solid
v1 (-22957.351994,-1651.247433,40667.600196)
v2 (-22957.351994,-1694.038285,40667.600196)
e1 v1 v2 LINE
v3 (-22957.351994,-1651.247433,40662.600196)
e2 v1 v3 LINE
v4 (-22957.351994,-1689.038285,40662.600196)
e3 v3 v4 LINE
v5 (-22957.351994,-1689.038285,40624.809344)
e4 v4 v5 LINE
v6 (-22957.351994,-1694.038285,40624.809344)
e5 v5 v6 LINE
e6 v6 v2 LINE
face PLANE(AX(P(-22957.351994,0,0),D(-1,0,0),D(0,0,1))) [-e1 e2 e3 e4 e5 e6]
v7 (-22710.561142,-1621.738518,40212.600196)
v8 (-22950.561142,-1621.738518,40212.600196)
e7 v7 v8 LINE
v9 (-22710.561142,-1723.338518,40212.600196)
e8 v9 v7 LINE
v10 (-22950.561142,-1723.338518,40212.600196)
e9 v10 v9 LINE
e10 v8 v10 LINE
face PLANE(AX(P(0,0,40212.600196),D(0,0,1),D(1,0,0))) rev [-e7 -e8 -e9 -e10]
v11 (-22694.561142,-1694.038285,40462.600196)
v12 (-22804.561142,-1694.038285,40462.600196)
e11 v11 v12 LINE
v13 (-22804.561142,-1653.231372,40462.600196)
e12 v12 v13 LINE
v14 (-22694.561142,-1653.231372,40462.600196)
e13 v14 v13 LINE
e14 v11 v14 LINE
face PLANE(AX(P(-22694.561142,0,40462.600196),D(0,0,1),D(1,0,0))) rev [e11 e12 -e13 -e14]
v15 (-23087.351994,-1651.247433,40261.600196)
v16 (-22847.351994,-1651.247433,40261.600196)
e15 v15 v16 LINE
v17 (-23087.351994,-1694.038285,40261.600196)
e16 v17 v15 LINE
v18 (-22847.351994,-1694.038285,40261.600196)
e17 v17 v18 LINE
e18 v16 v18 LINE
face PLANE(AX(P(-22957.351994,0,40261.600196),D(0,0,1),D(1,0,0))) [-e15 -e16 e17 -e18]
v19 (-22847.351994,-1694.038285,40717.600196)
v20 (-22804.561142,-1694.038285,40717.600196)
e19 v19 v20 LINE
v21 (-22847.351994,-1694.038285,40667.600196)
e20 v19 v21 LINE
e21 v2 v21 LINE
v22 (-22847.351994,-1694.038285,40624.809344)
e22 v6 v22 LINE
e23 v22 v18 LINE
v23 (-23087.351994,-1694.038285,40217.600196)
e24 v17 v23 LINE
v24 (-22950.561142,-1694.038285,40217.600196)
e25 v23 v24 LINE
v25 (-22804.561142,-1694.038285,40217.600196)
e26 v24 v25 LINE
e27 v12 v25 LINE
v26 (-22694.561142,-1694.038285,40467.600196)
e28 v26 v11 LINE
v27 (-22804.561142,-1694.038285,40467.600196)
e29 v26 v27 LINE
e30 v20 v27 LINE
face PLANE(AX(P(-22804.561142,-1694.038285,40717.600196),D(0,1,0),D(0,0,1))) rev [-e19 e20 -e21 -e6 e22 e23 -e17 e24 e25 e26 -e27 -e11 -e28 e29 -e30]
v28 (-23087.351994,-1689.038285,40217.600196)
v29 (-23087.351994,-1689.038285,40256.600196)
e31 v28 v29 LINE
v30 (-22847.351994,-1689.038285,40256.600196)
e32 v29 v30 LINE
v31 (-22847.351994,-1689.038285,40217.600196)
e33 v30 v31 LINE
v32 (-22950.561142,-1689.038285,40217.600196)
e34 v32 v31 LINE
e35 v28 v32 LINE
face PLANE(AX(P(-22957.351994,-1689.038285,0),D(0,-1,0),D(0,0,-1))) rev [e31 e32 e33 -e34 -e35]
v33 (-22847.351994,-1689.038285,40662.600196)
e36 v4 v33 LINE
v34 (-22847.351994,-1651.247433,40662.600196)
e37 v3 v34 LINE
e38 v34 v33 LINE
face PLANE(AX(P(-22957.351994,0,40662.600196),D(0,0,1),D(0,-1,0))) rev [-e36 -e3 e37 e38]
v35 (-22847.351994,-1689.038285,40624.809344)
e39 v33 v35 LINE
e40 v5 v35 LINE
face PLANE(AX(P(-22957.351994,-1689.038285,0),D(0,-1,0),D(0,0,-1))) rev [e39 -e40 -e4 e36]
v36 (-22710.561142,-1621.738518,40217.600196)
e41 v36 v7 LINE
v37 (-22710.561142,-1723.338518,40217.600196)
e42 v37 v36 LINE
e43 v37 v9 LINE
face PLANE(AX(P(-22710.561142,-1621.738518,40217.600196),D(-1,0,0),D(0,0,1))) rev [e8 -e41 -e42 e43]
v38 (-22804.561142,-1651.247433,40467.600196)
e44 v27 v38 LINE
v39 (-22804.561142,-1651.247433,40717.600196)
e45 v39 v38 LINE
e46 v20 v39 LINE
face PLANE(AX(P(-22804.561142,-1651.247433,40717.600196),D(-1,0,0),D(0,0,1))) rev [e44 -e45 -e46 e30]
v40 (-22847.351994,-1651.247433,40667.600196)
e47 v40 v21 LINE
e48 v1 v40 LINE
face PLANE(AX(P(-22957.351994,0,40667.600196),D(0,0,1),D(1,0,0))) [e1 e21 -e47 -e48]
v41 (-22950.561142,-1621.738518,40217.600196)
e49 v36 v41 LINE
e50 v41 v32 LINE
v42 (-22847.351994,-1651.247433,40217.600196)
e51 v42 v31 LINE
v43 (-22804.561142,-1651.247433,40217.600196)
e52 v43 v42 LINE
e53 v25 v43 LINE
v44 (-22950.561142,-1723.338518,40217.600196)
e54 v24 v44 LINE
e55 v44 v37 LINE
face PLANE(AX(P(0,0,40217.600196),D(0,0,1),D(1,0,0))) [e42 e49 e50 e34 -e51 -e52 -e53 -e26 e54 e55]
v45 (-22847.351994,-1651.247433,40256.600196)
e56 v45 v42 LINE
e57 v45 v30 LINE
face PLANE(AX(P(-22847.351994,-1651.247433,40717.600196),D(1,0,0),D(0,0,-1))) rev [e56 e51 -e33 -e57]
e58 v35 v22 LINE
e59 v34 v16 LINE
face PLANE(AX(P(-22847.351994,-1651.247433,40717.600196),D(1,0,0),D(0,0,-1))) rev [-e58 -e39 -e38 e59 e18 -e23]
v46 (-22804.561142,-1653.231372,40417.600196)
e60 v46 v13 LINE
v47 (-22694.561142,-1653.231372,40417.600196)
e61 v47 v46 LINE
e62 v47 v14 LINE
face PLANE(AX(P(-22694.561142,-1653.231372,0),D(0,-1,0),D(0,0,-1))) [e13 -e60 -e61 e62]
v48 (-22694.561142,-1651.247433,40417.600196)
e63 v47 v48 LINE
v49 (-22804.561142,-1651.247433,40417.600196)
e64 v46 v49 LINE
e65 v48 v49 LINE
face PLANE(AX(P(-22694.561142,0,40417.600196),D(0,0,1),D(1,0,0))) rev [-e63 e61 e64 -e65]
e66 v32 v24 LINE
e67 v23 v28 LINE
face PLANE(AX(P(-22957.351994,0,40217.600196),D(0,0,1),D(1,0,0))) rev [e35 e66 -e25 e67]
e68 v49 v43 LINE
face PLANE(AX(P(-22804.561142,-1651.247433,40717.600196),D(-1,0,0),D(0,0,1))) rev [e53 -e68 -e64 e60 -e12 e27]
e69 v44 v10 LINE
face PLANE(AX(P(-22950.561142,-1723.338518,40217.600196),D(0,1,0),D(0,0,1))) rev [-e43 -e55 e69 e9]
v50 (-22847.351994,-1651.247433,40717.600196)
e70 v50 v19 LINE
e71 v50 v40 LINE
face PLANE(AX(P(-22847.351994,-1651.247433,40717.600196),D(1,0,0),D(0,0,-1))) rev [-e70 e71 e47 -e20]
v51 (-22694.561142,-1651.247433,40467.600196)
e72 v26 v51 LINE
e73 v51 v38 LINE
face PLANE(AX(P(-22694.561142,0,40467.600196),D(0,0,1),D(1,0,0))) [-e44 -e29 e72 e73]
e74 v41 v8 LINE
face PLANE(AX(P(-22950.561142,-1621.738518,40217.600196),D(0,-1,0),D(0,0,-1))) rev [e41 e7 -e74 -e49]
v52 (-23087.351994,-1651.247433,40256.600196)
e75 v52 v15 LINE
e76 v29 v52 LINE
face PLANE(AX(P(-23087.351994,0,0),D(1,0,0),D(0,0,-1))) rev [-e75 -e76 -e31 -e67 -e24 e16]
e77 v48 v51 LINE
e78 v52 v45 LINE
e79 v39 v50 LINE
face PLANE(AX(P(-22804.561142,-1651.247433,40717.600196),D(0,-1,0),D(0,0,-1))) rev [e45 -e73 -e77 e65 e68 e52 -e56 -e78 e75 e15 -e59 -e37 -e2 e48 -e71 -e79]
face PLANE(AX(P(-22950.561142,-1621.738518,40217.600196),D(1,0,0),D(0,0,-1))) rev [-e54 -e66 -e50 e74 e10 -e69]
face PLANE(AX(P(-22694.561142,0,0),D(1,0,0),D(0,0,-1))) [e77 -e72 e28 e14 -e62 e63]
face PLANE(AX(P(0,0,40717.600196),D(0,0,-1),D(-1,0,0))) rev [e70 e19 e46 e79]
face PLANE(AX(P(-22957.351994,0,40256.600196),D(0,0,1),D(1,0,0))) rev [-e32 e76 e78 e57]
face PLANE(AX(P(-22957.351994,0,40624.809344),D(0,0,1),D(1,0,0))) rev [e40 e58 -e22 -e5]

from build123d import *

# Parameters (mm, degrees)
SKETCH1_W             = 240
SKETCH1_H             = 101.6
BOSS_EXTRUDE1_DEPTH   = 5
SKETCH2_W             = 42.790852113
SKETCH2_H             = 42.790852114
BOSS_EXTRUDE2_DEPTH   = 500
BOSS_EXTRUDE3_DEPTH   = 110
BOSS_EXTRUDE4_DEPTH   = 110
BOSS_EXTRUDE4_2_DEPTH = 110
BOSS_EXTRUDE5_START   = 110
BOSS_EXTRUDE5_DEPTH   = 130


# Read off the part's stored shape, not the designer's step: Boss-Extrude3
with BuildPart() as part:
    # Sketch1 → Boss-Extrude1 (new body)
    with BuildSketch(Plane.XY.offset(40212.600196068)):
        with Locations((-22830.561141865, -1672.538517707)):
            Rectangle(SKETCH1_W, SKETCH1_H)
    extrude(amount=BOSS_EXTRUDE1_DEPTH)


with BuildPart() as body_2:
    # Sketch2 → Boss-Extrude2 (new body)
    with BuildSketch(Plane.XY.offset(40217.600196068)):
        with Locations((-22825.956567922, -1672.642858756)):
            Rectangle(SKETCH2_W, SKETCH2_H)
    extrude(amount=BOSS_EXTRUDE2_DEPTH)


with BuildPart() as body_3:
    # Boss-Extrude3 outline → Boss-Extrude3 (new body)
    with BuildSketch(Plane(origin=(-22804.561141865, 0, 0), x_dir=(0, 0, -1), z_dir=(1, 0, 0))):
        Polygon((-40467.600196068, -1694.038284813), (-40462.600196068, -1694.038284813), (-40462.600196068, -1653.231371608), (-40417.600196068, -1653.231371608), (-40417.600196068, -1651.247432699), (-40467.600196068, -1651.247432699), align=None)
    extrude(amount=BOSS_EXTRUDE3_DEPTH)


with BuildPart() as body_4:
    # Sketch4 → Boss-Extrude4 (new body)
    with BuildSketch(Plane.ZY.offset(22847.351993978)):
        Polygon((40667.600196068, -1651.247432699), (40662.600196068, -1651.247432699), (40662.600196068, -1689.038284813), (40624.809343955, -1689.038284813), (40624.809343955, -1694.038284813), (40667.600196068, -1694.038284813), align=None)
    extrude(amount=BOSS_EXTRUDE4_DEPTH)


with BuildPart() as body_5:
    # Sketch4 → Boss-Extrude4 2 (new body)
    with BuildSketch(Plane.ZY.offset(22847.351993978)):
        Polygon((40261.600196068, -1651.247432699), (40256.600196068, -1651.247432699), (40256.600196068, -1689.038284813), (40217.600196068, -1689.038284813), (40217.600196068, -1694.038284813), (40261.600196068, -1694.038284813), align=None)
    extrude(amount=BOSS_EXTRUDE4_2_DEPTH)

    # Sketch4<3> → Boss-Extrude5 (add)
    with BuildSketch(Plane.ZY.offset(22847.351993978).offset(BOSS_EXTRUDE5_START)):
        Polygon((40261.600196068, -1694.038284813), (40261.600196068, -1651.247432699), (40256.600196068, -1651.247432699), (40256.600196068, -1689.038284813), (40217.600196068, -1689.038284813), (40217.600196068, -1694.038284813), align=None)
    extrude(amount=BOSS_EXTRUDE5_DEPTH)


with BuildPart() as body_2_1:
    add(body_2.part)

    # Combine1: union body 3, body 4, body 5, part
    add(body_3.part)
    add(body_4.part)
    add(body_5.part)
    add(part.part)


solid = body_2_1.part
